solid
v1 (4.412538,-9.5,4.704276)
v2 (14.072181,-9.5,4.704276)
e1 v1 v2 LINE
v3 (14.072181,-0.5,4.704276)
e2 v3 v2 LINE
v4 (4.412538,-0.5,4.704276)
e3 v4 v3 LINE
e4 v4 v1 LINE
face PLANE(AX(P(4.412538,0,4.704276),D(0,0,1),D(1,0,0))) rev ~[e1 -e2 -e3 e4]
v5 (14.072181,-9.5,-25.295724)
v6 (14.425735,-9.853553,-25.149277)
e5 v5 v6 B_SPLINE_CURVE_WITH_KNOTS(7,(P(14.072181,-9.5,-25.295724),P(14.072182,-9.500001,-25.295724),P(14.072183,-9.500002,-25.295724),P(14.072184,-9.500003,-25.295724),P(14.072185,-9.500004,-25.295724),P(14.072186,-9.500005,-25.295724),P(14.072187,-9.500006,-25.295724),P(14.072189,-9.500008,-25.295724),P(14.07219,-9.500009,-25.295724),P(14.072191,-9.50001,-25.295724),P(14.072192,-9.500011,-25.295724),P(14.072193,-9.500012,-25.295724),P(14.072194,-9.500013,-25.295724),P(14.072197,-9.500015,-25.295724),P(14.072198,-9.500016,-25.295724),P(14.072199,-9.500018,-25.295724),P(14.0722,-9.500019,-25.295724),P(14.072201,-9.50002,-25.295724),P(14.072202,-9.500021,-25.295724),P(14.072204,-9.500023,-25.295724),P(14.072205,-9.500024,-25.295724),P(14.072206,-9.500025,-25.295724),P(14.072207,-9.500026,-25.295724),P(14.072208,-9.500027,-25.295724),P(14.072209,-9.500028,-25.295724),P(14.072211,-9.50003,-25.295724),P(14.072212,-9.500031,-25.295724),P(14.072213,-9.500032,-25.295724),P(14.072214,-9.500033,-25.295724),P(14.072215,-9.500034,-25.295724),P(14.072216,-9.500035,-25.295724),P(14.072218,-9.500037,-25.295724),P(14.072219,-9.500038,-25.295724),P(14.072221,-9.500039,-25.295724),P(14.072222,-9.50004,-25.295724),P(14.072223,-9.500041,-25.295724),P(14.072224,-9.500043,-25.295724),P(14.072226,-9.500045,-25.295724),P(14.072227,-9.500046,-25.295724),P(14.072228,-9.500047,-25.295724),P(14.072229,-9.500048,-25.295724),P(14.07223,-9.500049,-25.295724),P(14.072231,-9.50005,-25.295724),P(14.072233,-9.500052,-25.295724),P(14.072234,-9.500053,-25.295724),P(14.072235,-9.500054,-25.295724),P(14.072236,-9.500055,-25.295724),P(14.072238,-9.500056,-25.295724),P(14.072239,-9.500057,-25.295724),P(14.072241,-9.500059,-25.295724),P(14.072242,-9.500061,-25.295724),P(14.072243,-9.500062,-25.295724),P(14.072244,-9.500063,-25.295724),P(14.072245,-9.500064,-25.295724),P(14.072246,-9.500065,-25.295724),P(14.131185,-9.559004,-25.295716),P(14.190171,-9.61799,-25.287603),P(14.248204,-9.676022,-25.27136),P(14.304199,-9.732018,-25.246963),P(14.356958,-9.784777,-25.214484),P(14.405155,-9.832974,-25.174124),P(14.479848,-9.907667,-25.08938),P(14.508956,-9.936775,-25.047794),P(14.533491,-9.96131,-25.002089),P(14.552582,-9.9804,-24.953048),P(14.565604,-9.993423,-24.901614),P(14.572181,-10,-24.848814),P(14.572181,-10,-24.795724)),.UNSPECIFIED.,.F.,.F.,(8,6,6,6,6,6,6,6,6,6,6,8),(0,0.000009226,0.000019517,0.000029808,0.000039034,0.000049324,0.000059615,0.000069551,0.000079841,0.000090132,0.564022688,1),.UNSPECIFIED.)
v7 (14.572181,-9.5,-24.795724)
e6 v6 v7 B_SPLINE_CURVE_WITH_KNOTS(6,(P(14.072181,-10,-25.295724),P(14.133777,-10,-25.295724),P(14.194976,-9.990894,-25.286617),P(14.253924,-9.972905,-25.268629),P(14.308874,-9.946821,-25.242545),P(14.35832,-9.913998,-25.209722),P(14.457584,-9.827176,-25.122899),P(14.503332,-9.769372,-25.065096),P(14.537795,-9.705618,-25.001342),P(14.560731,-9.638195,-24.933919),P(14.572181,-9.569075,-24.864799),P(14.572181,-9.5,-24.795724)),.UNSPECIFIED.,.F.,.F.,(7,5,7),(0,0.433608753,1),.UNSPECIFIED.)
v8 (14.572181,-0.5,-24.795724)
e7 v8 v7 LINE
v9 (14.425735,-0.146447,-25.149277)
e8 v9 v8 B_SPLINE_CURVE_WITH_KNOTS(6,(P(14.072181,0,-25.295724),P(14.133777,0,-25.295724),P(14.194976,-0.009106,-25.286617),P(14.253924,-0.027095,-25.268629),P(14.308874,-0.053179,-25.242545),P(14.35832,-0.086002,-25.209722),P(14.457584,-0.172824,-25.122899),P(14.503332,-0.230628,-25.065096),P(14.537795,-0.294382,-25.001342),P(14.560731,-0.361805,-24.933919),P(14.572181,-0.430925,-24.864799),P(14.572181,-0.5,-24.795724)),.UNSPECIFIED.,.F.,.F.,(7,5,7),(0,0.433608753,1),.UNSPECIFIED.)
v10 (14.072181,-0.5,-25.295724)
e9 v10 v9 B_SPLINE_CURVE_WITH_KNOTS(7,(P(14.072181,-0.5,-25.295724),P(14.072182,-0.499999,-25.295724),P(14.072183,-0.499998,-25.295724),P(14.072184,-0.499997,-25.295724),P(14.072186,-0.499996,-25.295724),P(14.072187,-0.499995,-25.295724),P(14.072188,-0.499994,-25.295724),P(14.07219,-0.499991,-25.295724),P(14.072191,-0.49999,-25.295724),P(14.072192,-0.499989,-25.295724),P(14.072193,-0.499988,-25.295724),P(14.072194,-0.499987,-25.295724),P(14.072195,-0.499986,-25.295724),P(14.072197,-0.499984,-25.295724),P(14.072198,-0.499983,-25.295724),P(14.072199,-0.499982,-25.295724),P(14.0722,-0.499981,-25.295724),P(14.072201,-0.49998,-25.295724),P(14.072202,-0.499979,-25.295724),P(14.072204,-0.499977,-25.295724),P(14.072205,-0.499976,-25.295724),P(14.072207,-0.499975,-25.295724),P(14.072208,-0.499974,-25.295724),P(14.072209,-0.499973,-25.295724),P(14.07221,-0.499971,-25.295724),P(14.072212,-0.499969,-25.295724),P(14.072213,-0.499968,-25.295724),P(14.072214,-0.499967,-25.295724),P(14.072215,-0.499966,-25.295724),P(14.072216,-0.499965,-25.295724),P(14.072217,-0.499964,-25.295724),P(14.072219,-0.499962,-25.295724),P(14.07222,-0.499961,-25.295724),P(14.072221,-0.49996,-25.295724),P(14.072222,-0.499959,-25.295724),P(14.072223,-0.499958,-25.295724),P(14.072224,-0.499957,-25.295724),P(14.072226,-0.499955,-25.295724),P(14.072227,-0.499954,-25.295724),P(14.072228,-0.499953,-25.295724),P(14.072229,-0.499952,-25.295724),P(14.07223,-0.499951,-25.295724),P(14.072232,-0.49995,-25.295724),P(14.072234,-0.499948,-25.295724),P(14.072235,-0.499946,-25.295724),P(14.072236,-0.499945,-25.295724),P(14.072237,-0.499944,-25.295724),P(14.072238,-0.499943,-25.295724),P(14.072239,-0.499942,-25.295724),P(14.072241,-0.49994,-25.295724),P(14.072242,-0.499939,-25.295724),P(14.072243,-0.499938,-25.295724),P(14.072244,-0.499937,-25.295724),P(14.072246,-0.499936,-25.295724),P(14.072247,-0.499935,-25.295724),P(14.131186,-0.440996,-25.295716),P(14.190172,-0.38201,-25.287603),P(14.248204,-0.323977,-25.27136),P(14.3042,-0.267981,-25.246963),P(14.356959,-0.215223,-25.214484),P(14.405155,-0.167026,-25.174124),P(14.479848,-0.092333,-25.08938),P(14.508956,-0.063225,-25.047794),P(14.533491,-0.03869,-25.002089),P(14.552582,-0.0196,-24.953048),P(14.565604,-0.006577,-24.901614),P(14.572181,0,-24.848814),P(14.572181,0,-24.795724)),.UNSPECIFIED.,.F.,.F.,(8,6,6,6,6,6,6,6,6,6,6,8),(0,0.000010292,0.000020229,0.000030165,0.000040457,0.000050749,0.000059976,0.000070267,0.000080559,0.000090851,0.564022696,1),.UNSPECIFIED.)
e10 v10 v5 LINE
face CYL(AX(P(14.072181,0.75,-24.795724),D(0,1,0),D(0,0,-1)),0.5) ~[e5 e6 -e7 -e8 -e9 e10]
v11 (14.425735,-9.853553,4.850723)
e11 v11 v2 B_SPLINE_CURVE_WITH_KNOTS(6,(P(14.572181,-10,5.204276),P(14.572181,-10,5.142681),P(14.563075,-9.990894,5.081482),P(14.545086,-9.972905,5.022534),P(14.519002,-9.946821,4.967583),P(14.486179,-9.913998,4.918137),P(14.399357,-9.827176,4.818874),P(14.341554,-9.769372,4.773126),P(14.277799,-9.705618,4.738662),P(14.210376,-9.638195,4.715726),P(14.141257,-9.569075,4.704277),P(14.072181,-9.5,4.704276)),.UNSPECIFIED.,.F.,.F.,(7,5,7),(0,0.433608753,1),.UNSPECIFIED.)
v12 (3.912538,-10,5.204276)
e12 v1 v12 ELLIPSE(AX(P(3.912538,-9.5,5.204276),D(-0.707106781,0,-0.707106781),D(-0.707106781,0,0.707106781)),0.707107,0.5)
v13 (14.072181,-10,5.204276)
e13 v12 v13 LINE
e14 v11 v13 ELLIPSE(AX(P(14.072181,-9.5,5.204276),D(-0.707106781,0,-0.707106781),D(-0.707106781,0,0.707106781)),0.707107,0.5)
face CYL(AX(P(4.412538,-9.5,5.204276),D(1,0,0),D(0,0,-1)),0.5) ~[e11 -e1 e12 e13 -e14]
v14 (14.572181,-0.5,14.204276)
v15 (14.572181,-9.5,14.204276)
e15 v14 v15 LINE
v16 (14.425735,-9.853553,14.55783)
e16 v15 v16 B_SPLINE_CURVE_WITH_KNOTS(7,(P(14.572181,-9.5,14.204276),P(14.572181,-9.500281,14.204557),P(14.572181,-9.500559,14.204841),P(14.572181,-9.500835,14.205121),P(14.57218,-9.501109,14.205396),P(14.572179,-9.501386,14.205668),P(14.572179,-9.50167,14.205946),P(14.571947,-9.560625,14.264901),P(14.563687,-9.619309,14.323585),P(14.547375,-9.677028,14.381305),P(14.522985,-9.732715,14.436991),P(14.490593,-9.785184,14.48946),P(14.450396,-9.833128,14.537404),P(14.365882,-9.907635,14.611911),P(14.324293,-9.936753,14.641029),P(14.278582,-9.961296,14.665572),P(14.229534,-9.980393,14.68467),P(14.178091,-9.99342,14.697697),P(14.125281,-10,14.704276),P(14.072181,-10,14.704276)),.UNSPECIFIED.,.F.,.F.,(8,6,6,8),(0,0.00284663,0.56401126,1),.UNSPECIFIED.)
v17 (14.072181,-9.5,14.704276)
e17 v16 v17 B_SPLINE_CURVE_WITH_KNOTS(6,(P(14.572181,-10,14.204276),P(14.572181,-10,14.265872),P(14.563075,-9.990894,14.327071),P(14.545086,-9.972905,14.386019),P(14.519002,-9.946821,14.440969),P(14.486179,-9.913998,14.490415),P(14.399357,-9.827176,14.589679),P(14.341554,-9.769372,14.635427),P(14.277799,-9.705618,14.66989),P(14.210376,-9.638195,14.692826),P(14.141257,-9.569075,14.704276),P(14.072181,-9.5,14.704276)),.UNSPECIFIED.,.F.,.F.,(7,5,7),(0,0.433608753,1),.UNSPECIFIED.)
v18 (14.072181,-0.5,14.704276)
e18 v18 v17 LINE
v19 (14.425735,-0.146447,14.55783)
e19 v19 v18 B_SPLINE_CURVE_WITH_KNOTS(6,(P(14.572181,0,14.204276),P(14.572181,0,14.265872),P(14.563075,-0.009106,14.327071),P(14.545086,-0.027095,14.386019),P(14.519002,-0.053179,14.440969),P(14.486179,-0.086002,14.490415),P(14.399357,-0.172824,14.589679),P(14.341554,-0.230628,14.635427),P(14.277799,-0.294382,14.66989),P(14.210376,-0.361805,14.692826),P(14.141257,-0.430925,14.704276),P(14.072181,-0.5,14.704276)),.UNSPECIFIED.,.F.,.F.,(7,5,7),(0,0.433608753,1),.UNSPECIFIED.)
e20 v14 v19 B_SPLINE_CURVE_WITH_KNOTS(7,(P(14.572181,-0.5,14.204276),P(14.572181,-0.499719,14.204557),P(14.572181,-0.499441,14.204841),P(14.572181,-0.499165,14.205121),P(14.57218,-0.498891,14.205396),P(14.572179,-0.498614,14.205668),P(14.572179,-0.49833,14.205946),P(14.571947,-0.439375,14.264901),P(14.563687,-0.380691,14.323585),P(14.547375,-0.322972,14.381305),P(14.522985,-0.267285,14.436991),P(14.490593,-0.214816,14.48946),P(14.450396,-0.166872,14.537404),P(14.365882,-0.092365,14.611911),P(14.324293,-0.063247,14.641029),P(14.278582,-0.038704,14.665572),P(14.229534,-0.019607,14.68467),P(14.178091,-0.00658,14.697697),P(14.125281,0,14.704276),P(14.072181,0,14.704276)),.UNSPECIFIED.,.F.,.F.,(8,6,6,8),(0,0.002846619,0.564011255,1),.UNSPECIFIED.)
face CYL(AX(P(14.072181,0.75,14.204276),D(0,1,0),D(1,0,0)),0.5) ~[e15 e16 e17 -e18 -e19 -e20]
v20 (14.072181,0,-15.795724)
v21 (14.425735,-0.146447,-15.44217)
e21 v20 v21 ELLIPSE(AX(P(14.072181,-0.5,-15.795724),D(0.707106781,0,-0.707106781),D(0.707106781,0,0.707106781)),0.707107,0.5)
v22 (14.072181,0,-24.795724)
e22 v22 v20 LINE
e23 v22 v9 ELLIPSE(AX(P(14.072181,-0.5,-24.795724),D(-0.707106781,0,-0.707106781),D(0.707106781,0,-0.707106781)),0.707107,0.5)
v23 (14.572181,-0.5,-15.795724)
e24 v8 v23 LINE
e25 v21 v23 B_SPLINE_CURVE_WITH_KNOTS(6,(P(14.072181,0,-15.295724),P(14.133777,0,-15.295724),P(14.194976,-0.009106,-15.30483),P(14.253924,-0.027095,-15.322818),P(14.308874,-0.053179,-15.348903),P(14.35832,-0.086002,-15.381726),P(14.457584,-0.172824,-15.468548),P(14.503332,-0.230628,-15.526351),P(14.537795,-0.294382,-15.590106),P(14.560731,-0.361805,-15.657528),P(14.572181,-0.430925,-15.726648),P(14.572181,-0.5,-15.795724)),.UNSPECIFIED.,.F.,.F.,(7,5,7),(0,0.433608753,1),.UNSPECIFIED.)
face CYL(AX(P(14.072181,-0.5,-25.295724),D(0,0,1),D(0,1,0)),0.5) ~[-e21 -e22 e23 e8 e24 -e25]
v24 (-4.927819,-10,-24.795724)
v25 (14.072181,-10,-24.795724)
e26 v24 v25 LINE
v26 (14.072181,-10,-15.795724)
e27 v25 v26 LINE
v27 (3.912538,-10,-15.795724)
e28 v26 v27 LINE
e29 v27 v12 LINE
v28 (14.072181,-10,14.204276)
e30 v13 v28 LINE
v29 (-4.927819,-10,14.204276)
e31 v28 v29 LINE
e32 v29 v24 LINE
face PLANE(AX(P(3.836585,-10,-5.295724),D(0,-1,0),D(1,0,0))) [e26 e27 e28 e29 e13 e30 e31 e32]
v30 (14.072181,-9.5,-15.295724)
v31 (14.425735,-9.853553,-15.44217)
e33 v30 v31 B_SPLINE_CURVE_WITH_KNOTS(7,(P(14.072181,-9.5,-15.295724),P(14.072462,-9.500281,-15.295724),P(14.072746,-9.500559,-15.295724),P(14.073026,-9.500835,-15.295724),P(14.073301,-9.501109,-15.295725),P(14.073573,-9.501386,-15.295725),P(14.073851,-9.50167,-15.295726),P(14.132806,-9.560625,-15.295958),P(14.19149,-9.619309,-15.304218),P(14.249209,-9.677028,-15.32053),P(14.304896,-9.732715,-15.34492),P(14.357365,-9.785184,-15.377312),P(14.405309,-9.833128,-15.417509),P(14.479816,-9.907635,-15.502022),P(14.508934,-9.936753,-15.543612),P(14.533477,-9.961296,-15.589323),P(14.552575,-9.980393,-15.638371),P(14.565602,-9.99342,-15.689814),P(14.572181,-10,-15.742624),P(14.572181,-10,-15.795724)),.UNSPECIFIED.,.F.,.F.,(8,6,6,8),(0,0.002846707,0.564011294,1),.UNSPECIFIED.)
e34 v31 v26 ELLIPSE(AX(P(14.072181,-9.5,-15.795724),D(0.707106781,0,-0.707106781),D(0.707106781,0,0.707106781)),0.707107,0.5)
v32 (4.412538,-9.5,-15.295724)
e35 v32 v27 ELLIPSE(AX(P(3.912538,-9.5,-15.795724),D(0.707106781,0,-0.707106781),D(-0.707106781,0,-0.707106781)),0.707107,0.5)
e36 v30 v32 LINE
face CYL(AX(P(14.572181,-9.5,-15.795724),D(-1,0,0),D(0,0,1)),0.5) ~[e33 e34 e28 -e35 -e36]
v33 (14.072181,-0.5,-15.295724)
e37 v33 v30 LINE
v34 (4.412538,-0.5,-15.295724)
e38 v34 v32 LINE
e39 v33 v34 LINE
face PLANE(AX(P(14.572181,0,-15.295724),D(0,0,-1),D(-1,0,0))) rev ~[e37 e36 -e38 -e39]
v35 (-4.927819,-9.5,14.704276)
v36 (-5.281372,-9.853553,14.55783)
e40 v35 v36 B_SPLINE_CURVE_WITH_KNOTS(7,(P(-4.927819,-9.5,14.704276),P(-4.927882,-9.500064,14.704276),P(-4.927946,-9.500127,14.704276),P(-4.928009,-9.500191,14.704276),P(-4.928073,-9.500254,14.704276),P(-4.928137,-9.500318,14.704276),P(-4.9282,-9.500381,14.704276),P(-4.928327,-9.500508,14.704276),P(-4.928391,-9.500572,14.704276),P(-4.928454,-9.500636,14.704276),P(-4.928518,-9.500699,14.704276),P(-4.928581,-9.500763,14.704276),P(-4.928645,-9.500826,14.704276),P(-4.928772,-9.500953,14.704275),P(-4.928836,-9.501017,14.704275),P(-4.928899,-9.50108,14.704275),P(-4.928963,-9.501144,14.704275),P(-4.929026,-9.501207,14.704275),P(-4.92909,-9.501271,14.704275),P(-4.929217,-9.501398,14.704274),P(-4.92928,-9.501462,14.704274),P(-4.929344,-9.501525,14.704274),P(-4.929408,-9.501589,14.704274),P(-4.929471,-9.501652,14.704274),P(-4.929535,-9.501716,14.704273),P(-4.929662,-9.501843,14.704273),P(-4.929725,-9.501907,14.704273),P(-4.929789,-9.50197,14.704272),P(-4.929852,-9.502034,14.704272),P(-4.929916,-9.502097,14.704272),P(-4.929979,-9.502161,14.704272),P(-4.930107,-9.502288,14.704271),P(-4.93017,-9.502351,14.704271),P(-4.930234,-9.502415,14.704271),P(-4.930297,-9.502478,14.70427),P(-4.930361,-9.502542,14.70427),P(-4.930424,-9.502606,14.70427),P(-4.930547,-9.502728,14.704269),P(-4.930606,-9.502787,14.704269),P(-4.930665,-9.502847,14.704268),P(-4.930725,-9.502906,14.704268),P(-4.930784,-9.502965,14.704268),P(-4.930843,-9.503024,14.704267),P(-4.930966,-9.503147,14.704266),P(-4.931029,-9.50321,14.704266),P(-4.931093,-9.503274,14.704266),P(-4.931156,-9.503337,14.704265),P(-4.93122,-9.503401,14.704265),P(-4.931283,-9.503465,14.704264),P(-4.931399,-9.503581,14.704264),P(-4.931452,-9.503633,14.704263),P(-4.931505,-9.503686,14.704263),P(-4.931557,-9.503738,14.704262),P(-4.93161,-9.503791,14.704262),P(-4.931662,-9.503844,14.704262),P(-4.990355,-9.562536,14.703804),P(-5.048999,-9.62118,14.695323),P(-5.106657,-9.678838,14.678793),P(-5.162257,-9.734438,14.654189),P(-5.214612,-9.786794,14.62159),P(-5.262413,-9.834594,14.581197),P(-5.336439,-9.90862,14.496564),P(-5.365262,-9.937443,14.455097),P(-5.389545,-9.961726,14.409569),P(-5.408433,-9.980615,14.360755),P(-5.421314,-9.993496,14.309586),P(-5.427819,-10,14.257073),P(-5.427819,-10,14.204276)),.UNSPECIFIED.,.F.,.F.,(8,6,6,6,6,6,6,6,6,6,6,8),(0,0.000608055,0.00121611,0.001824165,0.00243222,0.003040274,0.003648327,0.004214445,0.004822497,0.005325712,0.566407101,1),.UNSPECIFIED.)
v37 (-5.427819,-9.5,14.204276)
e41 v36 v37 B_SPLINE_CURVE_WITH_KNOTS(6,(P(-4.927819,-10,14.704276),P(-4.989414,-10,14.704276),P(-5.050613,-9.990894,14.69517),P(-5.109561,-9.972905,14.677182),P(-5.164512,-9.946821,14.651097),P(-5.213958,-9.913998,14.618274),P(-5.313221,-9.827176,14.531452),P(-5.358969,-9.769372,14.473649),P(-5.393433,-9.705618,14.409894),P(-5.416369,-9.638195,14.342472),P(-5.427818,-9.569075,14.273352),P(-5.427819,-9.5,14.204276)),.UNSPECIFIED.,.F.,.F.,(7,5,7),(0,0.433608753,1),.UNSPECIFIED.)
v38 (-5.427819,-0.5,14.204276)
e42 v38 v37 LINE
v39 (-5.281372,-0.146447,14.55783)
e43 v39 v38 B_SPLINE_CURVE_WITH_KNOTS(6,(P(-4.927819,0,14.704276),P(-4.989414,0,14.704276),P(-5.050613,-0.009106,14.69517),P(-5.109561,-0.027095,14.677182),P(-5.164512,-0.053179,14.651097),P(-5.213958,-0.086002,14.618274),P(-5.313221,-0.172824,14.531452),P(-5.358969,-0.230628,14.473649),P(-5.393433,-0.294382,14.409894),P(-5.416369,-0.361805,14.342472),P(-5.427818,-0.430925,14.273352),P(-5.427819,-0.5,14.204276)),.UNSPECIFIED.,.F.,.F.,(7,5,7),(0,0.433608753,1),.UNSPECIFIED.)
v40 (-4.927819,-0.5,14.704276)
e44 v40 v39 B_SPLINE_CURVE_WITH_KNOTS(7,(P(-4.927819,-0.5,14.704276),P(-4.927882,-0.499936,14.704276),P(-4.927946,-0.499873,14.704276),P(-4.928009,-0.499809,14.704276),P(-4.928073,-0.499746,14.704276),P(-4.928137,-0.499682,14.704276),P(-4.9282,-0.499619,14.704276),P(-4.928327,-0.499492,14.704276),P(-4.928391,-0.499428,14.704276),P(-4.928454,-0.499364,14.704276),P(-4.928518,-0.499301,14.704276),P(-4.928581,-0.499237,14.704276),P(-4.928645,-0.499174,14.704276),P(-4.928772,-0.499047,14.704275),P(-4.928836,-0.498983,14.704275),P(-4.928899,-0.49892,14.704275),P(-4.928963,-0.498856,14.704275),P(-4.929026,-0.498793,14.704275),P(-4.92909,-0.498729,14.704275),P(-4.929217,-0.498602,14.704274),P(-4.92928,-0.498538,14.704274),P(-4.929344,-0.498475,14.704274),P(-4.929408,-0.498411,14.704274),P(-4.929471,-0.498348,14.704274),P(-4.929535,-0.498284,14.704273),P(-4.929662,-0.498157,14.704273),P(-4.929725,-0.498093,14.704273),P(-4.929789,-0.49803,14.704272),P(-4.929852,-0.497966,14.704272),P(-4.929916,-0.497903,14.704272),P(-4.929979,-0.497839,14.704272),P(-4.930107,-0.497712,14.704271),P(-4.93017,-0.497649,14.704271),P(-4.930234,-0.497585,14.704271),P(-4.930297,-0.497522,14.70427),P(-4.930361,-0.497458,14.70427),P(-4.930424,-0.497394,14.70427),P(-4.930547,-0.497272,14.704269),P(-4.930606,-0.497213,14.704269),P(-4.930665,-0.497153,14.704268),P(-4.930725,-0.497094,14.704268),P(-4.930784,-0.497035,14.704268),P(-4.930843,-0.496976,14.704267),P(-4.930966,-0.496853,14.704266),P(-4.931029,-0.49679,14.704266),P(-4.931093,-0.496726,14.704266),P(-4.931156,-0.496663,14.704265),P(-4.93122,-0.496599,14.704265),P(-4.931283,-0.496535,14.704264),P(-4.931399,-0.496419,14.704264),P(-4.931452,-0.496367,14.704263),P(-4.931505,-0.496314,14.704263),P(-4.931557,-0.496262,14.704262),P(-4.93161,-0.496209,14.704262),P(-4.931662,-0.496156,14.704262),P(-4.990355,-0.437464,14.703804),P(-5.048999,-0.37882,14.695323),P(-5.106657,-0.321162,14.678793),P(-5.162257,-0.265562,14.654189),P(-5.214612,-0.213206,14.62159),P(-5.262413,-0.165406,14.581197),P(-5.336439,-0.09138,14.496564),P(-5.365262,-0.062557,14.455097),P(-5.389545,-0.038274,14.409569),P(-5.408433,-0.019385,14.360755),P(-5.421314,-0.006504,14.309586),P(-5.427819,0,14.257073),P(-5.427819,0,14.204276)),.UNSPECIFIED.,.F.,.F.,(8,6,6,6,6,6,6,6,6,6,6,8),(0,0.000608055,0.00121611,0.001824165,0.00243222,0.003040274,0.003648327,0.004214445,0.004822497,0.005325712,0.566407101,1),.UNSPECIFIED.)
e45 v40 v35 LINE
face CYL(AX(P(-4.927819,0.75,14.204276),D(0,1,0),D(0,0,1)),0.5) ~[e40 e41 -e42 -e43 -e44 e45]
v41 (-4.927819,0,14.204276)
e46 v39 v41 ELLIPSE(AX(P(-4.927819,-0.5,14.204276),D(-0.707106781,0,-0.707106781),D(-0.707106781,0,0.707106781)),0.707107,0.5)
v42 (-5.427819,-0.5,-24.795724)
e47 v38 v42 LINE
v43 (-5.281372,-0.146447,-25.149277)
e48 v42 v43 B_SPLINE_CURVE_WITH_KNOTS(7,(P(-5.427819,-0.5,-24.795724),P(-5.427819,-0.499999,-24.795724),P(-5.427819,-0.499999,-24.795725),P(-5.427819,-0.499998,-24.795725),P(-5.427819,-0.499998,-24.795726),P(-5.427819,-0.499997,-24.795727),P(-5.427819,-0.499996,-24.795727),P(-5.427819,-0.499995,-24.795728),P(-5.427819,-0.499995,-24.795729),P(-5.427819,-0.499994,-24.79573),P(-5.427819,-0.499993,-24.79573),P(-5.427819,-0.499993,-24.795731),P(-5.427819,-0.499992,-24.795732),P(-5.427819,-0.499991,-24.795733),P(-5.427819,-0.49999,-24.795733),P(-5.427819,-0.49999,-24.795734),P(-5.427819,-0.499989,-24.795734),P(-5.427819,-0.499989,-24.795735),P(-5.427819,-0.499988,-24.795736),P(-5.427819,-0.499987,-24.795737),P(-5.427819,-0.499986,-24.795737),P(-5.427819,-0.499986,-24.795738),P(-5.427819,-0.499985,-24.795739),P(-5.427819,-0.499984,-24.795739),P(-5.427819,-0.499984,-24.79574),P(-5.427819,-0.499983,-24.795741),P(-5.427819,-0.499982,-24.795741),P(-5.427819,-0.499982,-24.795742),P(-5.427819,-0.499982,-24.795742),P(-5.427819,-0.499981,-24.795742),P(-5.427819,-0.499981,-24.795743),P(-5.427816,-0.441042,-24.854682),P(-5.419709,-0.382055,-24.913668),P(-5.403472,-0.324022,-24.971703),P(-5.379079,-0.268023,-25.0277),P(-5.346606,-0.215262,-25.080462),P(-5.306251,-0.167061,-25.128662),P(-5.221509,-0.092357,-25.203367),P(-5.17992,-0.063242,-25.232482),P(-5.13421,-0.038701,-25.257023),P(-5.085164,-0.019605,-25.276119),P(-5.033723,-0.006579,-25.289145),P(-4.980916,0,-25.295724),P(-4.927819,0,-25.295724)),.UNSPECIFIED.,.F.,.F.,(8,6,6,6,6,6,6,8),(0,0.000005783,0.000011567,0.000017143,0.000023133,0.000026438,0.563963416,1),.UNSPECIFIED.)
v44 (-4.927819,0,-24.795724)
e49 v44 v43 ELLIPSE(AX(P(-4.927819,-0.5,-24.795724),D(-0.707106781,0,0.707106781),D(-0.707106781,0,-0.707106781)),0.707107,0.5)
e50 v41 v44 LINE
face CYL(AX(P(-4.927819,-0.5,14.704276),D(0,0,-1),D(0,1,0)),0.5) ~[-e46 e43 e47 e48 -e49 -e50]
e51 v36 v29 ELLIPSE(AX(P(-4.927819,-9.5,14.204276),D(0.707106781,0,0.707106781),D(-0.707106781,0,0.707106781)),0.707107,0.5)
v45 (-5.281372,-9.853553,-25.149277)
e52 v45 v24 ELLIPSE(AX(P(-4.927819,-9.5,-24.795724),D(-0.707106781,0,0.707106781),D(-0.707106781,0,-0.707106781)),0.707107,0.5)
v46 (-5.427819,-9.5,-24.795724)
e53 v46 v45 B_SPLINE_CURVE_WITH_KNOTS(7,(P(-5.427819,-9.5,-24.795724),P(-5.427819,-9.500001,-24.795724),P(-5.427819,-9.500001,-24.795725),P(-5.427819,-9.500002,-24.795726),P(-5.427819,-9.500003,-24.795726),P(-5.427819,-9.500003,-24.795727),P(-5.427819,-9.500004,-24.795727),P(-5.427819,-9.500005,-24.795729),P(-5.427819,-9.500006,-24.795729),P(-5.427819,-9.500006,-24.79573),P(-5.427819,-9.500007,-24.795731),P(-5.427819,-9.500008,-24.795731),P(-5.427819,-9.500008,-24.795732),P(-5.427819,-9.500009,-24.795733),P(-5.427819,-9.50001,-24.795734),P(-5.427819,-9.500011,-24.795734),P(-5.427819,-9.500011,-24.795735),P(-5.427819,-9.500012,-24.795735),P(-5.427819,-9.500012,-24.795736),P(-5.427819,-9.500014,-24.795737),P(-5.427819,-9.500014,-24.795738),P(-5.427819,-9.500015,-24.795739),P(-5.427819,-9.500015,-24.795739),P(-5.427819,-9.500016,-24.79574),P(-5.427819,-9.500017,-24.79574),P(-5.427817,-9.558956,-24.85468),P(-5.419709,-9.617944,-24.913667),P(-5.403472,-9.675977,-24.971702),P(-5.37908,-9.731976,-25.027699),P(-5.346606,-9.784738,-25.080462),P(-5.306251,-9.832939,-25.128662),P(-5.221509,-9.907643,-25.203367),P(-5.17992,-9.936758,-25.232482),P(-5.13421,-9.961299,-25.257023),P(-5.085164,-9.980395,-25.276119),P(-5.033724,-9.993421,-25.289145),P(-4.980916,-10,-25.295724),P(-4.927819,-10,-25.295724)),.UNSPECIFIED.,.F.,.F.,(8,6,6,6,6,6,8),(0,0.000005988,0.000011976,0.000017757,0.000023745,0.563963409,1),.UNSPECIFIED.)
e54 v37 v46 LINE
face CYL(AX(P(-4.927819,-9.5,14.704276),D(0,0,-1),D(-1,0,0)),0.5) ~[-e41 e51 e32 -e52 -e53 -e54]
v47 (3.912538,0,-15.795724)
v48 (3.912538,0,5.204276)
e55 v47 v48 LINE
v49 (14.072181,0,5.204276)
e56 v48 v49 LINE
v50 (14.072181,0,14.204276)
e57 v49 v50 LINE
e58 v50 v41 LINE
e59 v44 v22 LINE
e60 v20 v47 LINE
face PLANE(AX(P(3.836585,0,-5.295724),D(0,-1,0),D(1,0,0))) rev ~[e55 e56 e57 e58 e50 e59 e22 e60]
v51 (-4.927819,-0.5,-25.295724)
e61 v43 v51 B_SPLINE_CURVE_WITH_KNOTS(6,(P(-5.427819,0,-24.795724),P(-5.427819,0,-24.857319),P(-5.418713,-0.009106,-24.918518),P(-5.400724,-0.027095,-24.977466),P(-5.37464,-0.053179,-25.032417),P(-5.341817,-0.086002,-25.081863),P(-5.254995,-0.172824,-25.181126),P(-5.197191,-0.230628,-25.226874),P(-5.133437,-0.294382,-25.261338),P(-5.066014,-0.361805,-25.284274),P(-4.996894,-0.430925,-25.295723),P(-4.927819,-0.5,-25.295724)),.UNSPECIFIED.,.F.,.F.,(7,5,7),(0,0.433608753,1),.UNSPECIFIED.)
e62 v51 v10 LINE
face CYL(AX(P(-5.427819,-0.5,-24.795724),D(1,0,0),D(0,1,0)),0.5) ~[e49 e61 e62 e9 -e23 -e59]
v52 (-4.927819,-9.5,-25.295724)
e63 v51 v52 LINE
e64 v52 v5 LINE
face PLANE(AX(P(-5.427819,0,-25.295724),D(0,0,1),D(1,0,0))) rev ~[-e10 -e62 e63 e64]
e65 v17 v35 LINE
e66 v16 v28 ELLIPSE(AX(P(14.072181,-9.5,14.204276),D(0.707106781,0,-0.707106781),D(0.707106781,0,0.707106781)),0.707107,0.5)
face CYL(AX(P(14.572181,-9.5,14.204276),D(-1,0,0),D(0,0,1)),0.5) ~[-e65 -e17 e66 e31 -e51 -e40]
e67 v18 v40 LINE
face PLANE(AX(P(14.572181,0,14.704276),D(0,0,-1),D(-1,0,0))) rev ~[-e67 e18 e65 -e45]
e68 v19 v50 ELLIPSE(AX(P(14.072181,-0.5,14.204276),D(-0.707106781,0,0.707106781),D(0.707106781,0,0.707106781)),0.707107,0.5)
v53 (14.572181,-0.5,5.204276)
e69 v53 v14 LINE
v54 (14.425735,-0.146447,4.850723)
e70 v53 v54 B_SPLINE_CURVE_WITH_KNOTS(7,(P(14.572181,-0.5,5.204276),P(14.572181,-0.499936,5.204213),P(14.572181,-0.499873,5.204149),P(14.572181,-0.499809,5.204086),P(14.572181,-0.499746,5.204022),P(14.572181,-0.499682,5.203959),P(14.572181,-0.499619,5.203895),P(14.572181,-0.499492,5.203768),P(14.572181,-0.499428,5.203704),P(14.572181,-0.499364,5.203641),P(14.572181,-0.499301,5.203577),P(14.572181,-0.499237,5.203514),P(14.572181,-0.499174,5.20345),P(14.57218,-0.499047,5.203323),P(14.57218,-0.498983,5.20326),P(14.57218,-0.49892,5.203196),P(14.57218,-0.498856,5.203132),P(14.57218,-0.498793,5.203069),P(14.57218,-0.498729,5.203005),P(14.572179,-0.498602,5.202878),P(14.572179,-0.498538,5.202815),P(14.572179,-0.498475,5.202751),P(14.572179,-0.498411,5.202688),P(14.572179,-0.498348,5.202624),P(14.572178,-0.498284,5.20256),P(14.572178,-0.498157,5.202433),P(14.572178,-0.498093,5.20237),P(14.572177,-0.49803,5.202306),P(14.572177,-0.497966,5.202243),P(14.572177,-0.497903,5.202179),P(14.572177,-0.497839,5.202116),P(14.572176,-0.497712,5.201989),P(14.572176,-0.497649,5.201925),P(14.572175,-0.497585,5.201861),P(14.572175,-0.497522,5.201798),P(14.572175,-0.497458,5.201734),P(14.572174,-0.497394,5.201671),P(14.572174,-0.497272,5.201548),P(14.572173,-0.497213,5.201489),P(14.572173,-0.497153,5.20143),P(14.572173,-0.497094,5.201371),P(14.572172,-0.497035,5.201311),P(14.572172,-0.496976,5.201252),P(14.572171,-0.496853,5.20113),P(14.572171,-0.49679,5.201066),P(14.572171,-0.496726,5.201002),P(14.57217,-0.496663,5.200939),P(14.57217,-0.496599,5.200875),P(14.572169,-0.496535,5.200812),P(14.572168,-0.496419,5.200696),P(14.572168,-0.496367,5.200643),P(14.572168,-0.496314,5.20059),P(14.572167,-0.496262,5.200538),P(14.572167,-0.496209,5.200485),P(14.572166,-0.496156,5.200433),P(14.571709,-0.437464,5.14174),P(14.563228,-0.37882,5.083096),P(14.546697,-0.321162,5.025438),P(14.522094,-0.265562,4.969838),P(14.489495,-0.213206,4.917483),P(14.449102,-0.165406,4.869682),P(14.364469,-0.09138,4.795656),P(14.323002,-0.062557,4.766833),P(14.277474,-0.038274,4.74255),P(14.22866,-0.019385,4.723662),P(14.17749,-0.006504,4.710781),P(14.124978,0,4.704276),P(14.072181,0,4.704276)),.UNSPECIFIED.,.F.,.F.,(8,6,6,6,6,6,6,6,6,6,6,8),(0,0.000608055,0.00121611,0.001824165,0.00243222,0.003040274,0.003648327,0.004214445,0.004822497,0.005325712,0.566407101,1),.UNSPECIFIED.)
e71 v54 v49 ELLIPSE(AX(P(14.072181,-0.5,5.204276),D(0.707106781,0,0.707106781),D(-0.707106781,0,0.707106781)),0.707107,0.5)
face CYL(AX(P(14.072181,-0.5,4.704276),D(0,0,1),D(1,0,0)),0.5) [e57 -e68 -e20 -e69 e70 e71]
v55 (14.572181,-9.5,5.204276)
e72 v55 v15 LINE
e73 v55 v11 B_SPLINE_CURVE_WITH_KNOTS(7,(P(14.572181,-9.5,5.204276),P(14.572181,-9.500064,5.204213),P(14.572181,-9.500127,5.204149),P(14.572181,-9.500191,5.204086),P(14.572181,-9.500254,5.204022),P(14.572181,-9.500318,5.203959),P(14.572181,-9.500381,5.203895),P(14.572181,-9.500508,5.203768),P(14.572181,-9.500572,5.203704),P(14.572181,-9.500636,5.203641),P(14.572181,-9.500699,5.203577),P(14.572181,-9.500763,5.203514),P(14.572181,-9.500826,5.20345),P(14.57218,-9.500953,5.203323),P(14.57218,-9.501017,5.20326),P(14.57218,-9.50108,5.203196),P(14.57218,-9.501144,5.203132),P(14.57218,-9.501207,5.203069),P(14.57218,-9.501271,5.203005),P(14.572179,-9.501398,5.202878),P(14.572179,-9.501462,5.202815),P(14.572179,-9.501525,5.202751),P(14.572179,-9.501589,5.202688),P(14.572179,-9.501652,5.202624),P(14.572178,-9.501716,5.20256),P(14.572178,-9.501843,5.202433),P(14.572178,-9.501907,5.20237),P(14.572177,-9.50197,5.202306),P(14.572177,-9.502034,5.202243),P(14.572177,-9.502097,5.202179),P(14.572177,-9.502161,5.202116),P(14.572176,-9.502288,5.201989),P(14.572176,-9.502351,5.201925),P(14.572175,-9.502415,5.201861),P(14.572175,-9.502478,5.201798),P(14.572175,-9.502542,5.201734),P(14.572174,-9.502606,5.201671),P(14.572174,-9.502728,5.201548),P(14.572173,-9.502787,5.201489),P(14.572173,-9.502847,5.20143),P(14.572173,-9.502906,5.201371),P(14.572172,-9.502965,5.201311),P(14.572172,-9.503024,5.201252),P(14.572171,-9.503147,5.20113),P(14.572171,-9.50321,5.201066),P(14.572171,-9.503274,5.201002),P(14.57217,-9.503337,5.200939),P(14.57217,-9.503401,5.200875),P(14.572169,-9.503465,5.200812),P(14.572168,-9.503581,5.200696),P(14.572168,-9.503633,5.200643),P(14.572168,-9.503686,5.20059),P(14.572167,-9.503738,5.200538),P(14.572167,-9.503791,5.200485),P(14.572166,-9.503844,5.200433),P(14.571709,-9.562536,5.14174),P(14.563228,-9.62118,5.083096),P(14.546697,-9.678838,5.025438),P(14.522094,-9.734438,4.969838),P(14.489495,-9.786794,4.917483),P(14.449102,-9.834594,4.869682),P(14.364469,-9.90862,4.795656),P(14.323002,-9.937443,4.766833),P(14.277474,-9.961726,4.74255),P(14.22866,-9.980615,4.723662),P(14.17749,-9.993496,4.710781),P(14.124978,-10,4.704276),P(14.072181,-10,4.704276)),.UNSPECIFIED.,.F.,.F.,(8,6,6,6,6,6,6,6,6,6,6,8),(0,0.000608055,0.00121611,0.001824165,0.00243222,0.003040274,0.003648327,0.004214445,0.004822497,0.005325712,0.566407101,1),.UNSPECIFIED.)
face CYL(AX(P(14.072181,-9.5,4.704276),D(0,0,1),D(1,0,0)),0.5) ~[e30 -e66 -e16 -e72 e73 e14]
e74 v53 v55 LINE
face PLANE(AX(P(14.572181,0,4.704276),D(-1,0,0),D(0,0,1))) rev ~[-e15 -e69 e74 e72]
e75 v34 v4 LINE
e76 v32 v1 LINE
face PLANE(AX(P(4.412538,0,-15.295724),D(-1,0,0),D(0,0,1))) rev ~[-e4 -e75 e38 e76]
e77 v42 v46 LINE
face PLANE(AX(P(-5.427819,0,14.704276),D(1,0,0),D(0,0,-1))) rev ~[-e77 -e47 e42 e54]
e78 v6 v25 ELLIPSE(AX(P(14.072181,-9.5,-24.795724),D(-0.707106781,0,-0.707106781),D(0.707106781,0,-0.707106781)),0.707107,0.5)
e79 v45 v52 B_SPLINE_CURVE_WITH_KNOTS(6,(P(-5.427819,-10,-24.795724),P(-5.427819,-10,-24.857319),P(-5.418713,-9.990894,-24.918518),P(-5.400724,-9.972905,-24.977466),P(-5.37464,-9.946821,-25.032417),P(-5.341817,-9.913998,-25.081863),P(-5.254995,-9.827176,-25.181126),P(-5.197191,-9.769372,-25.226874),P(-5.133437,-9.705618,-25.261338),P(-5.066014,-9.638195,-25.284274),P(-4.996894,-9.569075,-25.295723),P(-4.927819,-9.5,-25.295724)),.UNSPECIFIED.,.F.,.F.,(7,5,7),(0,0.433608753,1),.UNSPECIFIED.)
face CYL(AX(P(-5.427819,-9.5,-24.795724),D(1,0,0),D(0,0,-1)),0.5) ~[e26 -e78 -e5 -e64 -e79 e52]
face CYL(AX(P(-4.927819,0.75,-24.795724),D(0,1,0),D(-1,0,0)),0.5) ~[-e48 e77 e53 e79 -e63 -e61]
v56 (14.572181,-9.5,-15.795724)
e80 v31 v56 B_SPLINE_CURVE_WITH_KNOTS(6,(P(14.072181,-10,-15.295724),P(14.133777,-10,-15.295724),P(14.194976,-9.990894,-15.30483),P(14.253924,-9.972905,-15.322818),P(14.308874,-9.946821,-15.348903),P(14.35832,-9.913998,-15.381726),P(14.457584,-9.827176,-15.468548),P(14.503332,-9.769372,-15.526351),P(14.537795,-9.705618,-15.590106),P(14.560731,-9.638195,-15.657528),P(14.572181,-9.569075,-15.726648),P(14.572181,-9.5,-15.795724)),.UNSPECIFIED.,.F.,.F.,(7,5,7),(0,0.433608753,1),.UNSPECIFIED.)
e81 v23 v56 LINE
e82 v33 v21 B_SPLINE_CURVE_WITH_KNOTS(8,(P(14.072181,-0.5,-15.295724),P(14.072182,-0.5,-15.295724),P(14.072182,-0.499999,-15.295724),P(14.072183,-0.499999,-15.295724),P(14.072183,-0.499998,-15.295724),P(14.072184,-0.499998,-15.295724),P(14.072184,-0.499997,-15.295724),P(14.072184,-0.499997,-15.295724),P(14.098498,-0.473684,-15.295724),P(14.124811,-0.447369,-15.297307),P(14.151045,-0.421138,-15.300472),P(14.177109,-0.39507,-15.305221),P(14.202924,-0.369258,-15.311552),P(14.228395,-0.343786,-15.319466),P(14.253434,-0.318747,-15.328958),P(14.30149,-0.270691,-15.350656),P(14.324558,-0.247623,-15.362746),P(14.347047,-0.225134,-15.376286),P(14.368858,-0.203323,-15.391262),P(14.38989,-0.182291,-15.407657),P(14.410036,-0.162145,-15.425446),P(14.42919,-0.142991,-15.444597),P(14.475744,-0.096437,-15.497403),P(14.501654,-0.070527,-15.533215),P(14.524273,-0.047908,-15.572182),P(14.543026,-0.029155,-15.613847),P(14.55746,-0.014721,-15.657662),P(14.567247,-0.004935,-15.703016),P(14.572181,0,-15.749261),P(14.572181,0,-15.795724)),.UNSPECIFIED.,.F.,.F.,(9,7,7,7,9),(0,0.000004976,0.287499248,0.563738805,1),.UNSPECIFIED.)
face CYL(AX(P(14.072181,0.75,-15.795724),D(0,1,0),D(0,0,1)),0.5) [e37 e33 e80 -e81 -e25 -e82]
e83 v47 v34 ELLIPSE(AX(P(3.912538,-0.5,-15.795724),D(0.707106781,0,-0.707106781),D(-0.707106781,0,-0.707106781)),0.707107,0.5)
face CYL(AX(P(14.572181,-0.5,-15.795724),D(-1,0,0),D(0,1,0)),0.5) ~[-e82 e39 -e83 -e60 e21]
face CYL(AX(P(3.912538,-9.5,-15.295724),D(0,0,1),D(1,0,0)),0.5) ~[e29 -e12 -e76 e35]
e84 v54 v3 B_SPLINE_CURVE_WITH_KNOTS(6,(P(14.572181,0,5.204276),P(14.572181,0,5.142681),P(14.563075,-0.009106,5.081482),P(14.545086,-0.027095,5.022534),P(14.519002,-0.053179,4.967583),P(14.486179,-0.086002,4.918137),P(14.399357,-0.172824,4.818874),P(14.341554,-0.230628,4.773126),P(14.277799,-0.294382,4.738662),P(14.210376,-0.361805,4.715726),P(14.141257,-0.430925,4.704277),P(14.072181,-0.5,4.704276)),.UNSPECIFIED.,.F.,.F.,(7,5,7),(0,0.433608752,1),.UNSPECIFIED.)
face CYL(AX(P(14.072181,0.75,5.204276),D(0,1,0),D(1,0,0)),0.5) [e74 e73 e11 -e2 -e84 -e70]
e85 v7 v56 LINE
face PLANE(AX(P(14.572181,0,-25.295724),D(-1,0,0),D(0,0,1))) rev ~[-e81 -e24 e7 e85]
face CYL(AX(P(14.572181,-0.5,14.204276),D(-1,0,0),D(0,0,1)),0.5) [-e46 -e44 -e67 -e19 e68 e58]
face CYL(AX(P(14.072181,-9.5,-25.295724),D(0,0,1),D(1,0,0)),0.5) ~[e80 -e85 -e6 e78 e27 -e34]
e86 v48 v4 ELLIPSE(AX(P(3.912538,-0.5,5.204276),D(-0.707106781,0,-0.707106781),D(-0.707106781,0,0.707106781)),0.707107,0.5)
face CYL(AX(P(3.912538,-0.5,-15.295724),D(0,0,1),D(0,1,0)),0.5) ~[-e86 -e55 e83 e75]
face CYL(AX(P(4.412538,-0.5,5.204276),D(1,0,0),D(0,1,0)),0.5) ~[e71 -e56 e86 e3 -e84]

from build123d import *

# Parameters (mm, degrees)
F1_DEPTH    = 10
F2_R        = 0.5
F3_R        = 0.5
F4_T1_DEPTH = 11.5


# Not quite as in the source:
# - a fillet or chamfer that OpenCascade refuses, or shapes differently, is made with other operations: its cross-section is extruded or revolved along the edge and cut away or added


with BuildPart() as f1:
    # F0 (on Front) → F1 (new body)
    with BuildSketch(Plane.XZ):
        Polygon((14.5721812431, 14.7042763403), (-5.4278187569, 14.7042763403), (-5.4278187569, -25.2957236597), (14.5721812431, -25.2957236597), (14.5721812431, -15.2957236597), (4.4125382692, -15.2957236597), (4.4125382692, 4.7042763403), (14.5721812431, 4.7042763403), align=None)
    extrude(amount=F1_DEPTH)

    # F2
    f2_edges = [f1.edges().sort_by_distance(p)[0] for p in [
        (14.572181, -10, 9.704276),
        (4.572181, -10, 14.704276),
        (-5.427819, -10, -5.295724),
        (4.572181, -10, -25.295724),
        (14.572181, -10, -20.295724),
        (9.49236, -10, -15.295724),
        (4.412538, -10, -5.295724),
        (9.49236, -10, 4.704276),
    ]]
    fillet(f2_edges, radius=F2_R)

    # F3
    f3_edges = [f1.edges().sort_by_distance(p)[0] for p in [
        (14.572181, 0, 9.704276),
        (4.572181, 0, 14.704276),
        (-5.427819, 0, -5.295724),
        (4.572181, 0, -25.295724),
        (14.572181, 0, -20.295724),
        (9.49236, 0, -15.295724),
        (4.412538, 0, -5.295724),
        (9.49236, 0, 4.704276),
    ]]
    fillet(f3_edges, radius=F3_R)

    # F4: fillet of radius 0.5 on 16 edges, made by hand

    # F4_s2 → F4_t1 (cut)
    with BuildSketch(Plane.XZ.offset(-0.75)):
        with BuildLine():
            ThreePointArc((14.0721812431, -25.2957236597), (14.4257346337, -25.1492770503), (14.5721812431, -24.7957236597))
            Line((14.5721812431, -24.7957236597), (14.5721812431, -25.2957236597))
            Line((14.5721812431, -25.2957236597), (14.0721812431, -25.2957236597))
        make_face()
        with BuildLine():
            ThreePointArc((14.0721812431, -15.2957236597), (14.4257346337, -15.4421702691), (14.5721812431, -15.7957236597))
            Line((14.5721812431, -15.7957236597), (14.5721812431, -15.2957236597))
            Line((14.5721812431, -15.2957236597), (14.0721812431, -15.2957236597))
        make_face()
        with BuildLine():
            ThreePointArc((-5.4278187569, -24.7957236597), (-5.2813721475, -25.1492770503), (-4.9278187569, -25.2957236597))
            Line((-4.9278187569, -25.2957236597), (-5.4278187569, -25.2957236597))
            Line((-5.4278187569, -25.2957236597), (-5.4278187569, -24.7957236597))
        make_face()
        with BuildLine():
            ThreePointArc((14.5721812431, 5.2042763403), (14.4257346337, 4.8507229497), (14.0721812431, 4.7042763403))
            Line((14.0721812431, 4.7042763403), (14.5721812431, 4.7042763403))
            Line((14.5721812431, 4.7042763403), (14.5721812431, 5.2042763403))
        make_face()
        with BuildLine():
            ThreePointArc((14.5721812431, 14.2042763403), (14.4257346337, 14.5578297309), (14.0721812431, 14.7042763403))
            Line((14.0721812431, 14.7042763403), (14.5721812431, 14.7042763403))
            Line((14.5721812431, 14.7042763403), (14.5721812431, 14.2042763403))
        make_face()
        with BuildLine():
            ThreePointArc((-4.9278187569, 14.7042763403), (-5.2813721475, 14.5578297309), (-5.4278187569, 14.2042763403))
            Line((-5.4278187569, 14.2042763403), (-5.4278187569, 14.7042763403))
            Line((-5.4278187569, 14.7042763403), (-4.9278187569, 14.7042763403))
        make_face()
    extrude(amount=F4_T1_DEPTH, mode=Mode.SUBTRACT)


solid = f1.part
